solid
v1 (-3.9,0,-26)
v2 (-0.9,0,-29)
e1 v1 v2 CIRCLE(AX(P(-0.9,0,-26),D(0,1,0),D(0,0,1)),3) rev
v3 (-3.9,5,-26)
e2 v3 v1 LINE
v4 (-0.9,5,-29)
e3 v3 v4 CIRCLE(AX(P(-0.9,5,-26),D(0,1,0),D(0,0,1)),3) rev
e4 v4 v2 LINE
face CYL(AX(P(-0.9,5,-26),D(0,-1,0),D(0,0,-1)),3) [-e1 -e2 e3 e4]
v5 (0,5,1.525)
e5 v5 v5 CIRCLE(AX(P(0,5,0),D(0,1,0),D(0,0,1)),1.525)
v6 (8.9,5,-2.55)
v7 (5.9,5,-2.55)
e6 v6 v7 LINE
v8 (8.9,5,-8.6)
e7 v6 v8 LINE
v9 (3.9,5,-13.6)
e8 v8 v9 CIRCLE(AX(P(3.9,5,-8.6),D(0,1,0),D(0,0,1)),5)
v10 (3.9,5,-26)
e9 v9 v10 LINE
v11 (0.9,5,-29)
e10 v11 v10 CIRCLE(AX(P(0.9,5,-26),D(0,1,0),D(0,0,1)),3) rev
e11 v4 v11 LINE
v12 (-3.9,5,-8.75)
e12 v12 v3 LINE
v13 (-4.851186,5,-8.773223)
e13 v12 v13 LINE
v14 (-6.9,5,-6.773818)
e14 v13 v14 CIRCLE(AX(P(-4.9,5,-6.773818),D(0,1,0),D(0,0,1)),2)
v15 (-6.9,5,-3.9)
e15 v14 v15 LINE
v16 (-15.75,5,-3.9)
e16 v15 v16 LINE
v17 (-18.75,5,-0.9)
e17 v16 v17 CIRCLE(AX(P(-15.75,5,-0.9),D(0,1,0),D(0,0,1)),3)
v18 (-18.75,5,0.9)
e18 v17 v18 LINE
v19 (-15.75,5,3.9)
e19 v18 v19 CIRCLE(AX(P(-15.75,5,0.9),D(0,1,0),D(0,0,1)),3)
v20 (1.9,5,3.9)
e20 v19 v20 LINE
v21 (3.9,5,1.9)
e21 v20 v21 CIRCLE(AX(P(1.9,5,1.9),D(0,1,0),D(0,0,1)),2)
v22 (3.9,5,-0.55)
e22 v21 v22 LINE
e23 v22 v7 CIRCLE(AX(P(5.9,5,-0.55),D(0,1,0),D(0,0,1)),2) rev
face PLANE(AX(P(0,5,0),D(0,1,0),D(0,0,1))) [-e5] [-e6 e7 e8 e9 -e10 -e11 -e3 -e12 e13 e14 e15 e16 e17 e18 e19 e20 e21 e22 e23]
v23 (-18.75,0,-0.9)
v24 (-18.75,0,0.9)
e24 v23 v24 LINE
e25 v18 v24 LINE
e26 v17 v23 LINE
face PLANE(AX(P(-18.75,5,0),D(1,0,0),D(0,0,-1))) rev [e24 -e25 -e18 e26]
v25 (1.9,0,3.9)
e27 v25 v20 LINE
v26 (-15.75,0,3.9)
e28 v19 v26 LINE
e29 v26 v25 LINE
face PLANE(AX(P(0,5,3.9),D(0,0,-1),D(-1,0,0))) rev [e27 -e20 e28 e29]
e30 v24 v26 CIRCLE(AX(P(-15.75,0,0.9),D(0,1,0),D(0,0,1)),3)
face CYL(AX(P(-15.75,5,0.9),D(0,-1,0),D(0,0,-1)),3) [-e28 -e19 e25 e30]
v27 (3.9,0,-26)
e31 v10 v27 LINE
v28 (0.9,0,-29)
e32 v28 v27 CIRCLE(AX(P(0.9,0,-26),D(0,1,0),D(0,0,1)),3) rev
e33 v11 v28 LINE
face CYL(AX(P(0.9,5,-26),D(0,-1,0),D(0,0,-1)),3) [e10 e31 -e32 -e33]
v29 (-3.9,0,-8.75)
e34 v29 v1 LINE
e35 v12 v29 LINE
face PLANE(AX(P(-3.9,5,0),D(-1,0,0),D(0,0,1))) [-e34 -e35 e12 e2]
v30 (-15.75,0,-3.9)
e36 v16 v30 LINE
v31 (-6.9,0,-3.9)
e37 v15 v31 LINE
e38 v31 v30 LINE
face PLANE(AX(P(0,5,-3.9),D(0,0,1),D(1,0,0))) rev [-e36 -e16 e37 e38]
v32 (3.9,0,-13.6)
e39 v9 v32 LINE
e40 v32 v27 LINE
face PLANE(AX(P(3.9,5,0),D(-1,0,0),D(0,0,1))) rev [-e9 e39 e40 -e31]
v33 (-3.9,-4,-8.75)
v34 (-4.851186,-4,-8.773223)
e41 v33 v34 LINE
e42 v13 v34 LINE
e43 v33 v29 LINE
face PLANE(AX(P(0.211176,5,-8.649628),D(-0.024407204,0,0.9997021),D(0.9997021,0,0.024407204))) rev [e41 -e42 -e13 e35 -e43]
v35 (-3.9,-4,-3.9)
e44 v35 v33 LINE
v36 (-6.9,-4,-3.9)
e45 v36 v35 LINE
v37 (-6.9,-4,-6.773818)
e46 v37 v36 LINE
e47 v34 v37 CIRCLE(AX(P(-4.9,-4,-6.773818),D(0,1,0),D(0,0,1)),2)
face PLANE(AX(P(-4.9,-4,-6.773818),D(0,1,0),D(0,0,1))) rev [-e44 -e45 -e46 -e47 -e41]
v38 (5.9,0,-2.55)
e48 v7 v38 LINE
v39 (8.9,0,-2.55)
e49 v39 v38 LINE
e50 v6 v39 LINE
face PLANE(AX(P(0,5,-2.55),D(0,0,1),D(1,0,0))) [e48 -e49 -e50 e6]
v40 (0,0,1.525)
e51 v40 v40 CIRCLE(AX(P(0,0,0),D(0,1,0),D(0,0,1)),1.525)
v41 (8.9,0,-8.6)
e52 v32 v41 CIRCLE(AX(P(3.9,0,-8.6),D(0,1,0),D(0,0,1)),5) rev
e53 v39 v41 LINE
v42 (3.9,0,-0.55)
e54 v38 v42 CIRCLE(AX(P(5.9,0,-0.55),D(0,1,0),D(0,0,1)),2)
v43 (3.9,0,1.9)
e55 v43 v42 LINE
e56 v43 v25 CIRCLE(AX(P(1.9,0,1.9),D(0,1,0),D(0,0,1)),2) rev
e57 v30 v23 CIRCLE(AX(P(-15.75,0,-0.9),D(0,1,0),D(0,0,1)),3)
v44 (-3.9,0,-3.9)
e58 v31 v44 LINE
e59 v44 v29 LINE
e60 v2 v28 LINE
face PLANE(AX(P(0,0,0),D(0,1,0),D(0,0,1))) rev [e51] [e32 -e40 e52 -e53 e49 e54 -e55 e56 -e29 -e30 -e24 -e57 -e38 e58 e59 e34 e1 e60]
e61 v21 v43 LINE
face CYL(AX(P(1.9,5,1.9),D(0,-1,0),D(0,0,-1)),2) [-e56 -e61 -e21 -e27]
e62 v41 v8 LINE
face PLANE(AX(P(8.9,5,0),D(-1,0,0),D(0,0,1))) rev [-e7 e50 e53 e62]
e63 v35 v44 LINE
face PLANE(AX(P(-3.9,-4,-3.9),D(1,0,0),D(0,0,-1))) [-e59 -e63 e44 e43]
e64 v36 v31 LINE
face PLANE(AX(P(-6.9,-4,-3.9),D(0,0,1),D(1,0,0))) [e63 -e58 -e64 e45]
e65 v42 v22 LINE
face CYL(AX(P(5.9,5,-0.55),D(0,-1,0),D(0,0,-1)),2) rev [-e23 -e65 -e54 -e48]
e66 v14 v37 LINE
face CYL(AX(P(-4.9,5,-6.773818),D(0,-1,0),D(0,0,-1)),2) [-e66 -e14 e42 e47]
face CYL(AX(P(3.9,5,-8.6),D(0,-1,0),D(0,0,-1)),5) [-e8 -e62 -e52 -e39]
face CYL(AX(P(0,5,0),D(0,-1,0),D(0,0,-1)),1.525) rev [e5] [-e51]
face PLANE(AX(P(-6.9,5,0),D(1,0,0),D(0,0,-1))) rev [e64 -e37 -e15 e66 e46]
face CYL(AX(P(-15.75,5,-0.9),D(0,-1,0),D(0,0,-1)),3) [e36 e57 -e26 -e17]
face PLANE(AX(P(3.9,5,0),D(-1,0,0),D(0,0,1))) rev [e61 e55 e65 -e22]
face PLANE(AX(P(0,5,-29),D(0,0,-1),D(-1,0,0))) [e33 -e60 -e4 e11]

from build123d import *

# Parameters (mm, degrees)
SKETCH_1_R      = 1.525
EXTRUDE_1_DEPTH = 5
EXTRUDE_START   = -4
EXTRUDE_4_DEPTH = 4
FILLET_1_R      = 2
FILLET_2_R      = 5
FILLET_3_R      = 2


with BuildPart() as part:
    # 草图1 → 凸台-拉伸1 (new body)
    with BuildSketch(Plane(origin=(0, 0, 0), x_dir=(1, 0, 0), z_dir=(0, 1, 0))):
        with BuildLine():
            Line((3.9, -3.732227301), (3.9, 2.55))
            Line((3.9, 2.55), (5.747877547, 2.55))
            Line((5.747877547, 2.55), (8.9, 2.55))
            Line((8.9, 2.55), (8.9, 13.6))
            Line((8.9, 13.6), (3.9, 13.6))
            Line((3.9, 13.6), (3.9, 13.765734151))
            Line((3.9, 13.765734151), (3.9, 26))
            ThreePointArc((3.9, 26), (3.021320344, 28.121320344), (0.9, 29))
            Line((0.9, 29), (-0.9, 29))
            ThreePointArc((-0.9, 29), (-3.021320344, 28.121320344), (-3.9, 26))
            Line((-3.9, 26), (-3.9, 8.75))
            Line((-3.9, 8.75), (-4.851185593, 8.773222699))
            ThreePointArc((-4.851185593, 8.773222699), (-6.29684845, 8.205186518), (-6.9, 6.773818499))
            Line((-6.9, 6.773818499), (-6.9, 3.9))
            Line((-6.9, 3.9), (-15.75, 3.9))
            ThreePointArc((-15.75, 3.9), (-17.871320344, 3.021320344), (-18.75, 0.9))
            Line((-18.75, 0.9), (-18.75, -0.9))
            ThreePointArc((-18.75, -0.9), (-17.871320344, -3.021320344), (-15.75, -3.9))
            Line((-15.75, -3.9), (0, -3.9))
            Line((0, -3.9), (3.9, -3.9))
            Line((3.9, -3.9), (3.9, -3.732227301))
        make_face()
        with Locations(Location((0, 0, 0), (0, 0, 270))):
            Circle(SKETCH_1_R, mode=Mode.SUBTRACT)
    extrude(amount=EXTRUDE_1_DEPTH)

    # 草图4 → 凸台-拉伸4 (add)
    with BuildSketch(Plane(origin=(0, 0, 0), x_dir=(1, 0, 0), z_dir=(0, 1, 0)).offset(EXTRUDE_START)):
        with BuildLine():
            Line((-6.9, 3.9), (-3.9, 3.9))
            Line((-3.9, 3.9), (-3.9, 8.75))
            Line((-3.9, 8.75), (-4.851185593, 8.773222699))
            ThreePointArc((-4.851185593, 8.773222699), (-6.29684845, 8.205186518), (-6.9, 6.773818499))
            Line((-6.9, 6.773818499), (-6.9, 3.9))
        make_face()
    extrude(amount=EXTRUDE_4_DEPTH)

    # 圆角1
    fillet_1_edges = [part.edges().sort_by_distance(p)[0] for p in [
        (3.9, 2.5, 3.9),
    ]]
    fillet(fillet_1_edges, radius=FILLET_1_R)

    # 圆角2
    fillet_2_edges = [part.edges().sort_by_distance(p)[0] for p in [
        (8.9, 2.5, -13.6),
    ]]
    fillet(fillet_2_edges, radius=FILLET_2_R - 0.0001)  # a hair under: the kernel refuses the full size

    # 圆角3
    fillet_3_edges = [part.edges().sort_by_distance(p)[0] for p in [
        (3.9, 2.5, -2.55),
    ]]
    fillet(fillet_3_edges, radius=FILLET_3_R)


solid = part.part
